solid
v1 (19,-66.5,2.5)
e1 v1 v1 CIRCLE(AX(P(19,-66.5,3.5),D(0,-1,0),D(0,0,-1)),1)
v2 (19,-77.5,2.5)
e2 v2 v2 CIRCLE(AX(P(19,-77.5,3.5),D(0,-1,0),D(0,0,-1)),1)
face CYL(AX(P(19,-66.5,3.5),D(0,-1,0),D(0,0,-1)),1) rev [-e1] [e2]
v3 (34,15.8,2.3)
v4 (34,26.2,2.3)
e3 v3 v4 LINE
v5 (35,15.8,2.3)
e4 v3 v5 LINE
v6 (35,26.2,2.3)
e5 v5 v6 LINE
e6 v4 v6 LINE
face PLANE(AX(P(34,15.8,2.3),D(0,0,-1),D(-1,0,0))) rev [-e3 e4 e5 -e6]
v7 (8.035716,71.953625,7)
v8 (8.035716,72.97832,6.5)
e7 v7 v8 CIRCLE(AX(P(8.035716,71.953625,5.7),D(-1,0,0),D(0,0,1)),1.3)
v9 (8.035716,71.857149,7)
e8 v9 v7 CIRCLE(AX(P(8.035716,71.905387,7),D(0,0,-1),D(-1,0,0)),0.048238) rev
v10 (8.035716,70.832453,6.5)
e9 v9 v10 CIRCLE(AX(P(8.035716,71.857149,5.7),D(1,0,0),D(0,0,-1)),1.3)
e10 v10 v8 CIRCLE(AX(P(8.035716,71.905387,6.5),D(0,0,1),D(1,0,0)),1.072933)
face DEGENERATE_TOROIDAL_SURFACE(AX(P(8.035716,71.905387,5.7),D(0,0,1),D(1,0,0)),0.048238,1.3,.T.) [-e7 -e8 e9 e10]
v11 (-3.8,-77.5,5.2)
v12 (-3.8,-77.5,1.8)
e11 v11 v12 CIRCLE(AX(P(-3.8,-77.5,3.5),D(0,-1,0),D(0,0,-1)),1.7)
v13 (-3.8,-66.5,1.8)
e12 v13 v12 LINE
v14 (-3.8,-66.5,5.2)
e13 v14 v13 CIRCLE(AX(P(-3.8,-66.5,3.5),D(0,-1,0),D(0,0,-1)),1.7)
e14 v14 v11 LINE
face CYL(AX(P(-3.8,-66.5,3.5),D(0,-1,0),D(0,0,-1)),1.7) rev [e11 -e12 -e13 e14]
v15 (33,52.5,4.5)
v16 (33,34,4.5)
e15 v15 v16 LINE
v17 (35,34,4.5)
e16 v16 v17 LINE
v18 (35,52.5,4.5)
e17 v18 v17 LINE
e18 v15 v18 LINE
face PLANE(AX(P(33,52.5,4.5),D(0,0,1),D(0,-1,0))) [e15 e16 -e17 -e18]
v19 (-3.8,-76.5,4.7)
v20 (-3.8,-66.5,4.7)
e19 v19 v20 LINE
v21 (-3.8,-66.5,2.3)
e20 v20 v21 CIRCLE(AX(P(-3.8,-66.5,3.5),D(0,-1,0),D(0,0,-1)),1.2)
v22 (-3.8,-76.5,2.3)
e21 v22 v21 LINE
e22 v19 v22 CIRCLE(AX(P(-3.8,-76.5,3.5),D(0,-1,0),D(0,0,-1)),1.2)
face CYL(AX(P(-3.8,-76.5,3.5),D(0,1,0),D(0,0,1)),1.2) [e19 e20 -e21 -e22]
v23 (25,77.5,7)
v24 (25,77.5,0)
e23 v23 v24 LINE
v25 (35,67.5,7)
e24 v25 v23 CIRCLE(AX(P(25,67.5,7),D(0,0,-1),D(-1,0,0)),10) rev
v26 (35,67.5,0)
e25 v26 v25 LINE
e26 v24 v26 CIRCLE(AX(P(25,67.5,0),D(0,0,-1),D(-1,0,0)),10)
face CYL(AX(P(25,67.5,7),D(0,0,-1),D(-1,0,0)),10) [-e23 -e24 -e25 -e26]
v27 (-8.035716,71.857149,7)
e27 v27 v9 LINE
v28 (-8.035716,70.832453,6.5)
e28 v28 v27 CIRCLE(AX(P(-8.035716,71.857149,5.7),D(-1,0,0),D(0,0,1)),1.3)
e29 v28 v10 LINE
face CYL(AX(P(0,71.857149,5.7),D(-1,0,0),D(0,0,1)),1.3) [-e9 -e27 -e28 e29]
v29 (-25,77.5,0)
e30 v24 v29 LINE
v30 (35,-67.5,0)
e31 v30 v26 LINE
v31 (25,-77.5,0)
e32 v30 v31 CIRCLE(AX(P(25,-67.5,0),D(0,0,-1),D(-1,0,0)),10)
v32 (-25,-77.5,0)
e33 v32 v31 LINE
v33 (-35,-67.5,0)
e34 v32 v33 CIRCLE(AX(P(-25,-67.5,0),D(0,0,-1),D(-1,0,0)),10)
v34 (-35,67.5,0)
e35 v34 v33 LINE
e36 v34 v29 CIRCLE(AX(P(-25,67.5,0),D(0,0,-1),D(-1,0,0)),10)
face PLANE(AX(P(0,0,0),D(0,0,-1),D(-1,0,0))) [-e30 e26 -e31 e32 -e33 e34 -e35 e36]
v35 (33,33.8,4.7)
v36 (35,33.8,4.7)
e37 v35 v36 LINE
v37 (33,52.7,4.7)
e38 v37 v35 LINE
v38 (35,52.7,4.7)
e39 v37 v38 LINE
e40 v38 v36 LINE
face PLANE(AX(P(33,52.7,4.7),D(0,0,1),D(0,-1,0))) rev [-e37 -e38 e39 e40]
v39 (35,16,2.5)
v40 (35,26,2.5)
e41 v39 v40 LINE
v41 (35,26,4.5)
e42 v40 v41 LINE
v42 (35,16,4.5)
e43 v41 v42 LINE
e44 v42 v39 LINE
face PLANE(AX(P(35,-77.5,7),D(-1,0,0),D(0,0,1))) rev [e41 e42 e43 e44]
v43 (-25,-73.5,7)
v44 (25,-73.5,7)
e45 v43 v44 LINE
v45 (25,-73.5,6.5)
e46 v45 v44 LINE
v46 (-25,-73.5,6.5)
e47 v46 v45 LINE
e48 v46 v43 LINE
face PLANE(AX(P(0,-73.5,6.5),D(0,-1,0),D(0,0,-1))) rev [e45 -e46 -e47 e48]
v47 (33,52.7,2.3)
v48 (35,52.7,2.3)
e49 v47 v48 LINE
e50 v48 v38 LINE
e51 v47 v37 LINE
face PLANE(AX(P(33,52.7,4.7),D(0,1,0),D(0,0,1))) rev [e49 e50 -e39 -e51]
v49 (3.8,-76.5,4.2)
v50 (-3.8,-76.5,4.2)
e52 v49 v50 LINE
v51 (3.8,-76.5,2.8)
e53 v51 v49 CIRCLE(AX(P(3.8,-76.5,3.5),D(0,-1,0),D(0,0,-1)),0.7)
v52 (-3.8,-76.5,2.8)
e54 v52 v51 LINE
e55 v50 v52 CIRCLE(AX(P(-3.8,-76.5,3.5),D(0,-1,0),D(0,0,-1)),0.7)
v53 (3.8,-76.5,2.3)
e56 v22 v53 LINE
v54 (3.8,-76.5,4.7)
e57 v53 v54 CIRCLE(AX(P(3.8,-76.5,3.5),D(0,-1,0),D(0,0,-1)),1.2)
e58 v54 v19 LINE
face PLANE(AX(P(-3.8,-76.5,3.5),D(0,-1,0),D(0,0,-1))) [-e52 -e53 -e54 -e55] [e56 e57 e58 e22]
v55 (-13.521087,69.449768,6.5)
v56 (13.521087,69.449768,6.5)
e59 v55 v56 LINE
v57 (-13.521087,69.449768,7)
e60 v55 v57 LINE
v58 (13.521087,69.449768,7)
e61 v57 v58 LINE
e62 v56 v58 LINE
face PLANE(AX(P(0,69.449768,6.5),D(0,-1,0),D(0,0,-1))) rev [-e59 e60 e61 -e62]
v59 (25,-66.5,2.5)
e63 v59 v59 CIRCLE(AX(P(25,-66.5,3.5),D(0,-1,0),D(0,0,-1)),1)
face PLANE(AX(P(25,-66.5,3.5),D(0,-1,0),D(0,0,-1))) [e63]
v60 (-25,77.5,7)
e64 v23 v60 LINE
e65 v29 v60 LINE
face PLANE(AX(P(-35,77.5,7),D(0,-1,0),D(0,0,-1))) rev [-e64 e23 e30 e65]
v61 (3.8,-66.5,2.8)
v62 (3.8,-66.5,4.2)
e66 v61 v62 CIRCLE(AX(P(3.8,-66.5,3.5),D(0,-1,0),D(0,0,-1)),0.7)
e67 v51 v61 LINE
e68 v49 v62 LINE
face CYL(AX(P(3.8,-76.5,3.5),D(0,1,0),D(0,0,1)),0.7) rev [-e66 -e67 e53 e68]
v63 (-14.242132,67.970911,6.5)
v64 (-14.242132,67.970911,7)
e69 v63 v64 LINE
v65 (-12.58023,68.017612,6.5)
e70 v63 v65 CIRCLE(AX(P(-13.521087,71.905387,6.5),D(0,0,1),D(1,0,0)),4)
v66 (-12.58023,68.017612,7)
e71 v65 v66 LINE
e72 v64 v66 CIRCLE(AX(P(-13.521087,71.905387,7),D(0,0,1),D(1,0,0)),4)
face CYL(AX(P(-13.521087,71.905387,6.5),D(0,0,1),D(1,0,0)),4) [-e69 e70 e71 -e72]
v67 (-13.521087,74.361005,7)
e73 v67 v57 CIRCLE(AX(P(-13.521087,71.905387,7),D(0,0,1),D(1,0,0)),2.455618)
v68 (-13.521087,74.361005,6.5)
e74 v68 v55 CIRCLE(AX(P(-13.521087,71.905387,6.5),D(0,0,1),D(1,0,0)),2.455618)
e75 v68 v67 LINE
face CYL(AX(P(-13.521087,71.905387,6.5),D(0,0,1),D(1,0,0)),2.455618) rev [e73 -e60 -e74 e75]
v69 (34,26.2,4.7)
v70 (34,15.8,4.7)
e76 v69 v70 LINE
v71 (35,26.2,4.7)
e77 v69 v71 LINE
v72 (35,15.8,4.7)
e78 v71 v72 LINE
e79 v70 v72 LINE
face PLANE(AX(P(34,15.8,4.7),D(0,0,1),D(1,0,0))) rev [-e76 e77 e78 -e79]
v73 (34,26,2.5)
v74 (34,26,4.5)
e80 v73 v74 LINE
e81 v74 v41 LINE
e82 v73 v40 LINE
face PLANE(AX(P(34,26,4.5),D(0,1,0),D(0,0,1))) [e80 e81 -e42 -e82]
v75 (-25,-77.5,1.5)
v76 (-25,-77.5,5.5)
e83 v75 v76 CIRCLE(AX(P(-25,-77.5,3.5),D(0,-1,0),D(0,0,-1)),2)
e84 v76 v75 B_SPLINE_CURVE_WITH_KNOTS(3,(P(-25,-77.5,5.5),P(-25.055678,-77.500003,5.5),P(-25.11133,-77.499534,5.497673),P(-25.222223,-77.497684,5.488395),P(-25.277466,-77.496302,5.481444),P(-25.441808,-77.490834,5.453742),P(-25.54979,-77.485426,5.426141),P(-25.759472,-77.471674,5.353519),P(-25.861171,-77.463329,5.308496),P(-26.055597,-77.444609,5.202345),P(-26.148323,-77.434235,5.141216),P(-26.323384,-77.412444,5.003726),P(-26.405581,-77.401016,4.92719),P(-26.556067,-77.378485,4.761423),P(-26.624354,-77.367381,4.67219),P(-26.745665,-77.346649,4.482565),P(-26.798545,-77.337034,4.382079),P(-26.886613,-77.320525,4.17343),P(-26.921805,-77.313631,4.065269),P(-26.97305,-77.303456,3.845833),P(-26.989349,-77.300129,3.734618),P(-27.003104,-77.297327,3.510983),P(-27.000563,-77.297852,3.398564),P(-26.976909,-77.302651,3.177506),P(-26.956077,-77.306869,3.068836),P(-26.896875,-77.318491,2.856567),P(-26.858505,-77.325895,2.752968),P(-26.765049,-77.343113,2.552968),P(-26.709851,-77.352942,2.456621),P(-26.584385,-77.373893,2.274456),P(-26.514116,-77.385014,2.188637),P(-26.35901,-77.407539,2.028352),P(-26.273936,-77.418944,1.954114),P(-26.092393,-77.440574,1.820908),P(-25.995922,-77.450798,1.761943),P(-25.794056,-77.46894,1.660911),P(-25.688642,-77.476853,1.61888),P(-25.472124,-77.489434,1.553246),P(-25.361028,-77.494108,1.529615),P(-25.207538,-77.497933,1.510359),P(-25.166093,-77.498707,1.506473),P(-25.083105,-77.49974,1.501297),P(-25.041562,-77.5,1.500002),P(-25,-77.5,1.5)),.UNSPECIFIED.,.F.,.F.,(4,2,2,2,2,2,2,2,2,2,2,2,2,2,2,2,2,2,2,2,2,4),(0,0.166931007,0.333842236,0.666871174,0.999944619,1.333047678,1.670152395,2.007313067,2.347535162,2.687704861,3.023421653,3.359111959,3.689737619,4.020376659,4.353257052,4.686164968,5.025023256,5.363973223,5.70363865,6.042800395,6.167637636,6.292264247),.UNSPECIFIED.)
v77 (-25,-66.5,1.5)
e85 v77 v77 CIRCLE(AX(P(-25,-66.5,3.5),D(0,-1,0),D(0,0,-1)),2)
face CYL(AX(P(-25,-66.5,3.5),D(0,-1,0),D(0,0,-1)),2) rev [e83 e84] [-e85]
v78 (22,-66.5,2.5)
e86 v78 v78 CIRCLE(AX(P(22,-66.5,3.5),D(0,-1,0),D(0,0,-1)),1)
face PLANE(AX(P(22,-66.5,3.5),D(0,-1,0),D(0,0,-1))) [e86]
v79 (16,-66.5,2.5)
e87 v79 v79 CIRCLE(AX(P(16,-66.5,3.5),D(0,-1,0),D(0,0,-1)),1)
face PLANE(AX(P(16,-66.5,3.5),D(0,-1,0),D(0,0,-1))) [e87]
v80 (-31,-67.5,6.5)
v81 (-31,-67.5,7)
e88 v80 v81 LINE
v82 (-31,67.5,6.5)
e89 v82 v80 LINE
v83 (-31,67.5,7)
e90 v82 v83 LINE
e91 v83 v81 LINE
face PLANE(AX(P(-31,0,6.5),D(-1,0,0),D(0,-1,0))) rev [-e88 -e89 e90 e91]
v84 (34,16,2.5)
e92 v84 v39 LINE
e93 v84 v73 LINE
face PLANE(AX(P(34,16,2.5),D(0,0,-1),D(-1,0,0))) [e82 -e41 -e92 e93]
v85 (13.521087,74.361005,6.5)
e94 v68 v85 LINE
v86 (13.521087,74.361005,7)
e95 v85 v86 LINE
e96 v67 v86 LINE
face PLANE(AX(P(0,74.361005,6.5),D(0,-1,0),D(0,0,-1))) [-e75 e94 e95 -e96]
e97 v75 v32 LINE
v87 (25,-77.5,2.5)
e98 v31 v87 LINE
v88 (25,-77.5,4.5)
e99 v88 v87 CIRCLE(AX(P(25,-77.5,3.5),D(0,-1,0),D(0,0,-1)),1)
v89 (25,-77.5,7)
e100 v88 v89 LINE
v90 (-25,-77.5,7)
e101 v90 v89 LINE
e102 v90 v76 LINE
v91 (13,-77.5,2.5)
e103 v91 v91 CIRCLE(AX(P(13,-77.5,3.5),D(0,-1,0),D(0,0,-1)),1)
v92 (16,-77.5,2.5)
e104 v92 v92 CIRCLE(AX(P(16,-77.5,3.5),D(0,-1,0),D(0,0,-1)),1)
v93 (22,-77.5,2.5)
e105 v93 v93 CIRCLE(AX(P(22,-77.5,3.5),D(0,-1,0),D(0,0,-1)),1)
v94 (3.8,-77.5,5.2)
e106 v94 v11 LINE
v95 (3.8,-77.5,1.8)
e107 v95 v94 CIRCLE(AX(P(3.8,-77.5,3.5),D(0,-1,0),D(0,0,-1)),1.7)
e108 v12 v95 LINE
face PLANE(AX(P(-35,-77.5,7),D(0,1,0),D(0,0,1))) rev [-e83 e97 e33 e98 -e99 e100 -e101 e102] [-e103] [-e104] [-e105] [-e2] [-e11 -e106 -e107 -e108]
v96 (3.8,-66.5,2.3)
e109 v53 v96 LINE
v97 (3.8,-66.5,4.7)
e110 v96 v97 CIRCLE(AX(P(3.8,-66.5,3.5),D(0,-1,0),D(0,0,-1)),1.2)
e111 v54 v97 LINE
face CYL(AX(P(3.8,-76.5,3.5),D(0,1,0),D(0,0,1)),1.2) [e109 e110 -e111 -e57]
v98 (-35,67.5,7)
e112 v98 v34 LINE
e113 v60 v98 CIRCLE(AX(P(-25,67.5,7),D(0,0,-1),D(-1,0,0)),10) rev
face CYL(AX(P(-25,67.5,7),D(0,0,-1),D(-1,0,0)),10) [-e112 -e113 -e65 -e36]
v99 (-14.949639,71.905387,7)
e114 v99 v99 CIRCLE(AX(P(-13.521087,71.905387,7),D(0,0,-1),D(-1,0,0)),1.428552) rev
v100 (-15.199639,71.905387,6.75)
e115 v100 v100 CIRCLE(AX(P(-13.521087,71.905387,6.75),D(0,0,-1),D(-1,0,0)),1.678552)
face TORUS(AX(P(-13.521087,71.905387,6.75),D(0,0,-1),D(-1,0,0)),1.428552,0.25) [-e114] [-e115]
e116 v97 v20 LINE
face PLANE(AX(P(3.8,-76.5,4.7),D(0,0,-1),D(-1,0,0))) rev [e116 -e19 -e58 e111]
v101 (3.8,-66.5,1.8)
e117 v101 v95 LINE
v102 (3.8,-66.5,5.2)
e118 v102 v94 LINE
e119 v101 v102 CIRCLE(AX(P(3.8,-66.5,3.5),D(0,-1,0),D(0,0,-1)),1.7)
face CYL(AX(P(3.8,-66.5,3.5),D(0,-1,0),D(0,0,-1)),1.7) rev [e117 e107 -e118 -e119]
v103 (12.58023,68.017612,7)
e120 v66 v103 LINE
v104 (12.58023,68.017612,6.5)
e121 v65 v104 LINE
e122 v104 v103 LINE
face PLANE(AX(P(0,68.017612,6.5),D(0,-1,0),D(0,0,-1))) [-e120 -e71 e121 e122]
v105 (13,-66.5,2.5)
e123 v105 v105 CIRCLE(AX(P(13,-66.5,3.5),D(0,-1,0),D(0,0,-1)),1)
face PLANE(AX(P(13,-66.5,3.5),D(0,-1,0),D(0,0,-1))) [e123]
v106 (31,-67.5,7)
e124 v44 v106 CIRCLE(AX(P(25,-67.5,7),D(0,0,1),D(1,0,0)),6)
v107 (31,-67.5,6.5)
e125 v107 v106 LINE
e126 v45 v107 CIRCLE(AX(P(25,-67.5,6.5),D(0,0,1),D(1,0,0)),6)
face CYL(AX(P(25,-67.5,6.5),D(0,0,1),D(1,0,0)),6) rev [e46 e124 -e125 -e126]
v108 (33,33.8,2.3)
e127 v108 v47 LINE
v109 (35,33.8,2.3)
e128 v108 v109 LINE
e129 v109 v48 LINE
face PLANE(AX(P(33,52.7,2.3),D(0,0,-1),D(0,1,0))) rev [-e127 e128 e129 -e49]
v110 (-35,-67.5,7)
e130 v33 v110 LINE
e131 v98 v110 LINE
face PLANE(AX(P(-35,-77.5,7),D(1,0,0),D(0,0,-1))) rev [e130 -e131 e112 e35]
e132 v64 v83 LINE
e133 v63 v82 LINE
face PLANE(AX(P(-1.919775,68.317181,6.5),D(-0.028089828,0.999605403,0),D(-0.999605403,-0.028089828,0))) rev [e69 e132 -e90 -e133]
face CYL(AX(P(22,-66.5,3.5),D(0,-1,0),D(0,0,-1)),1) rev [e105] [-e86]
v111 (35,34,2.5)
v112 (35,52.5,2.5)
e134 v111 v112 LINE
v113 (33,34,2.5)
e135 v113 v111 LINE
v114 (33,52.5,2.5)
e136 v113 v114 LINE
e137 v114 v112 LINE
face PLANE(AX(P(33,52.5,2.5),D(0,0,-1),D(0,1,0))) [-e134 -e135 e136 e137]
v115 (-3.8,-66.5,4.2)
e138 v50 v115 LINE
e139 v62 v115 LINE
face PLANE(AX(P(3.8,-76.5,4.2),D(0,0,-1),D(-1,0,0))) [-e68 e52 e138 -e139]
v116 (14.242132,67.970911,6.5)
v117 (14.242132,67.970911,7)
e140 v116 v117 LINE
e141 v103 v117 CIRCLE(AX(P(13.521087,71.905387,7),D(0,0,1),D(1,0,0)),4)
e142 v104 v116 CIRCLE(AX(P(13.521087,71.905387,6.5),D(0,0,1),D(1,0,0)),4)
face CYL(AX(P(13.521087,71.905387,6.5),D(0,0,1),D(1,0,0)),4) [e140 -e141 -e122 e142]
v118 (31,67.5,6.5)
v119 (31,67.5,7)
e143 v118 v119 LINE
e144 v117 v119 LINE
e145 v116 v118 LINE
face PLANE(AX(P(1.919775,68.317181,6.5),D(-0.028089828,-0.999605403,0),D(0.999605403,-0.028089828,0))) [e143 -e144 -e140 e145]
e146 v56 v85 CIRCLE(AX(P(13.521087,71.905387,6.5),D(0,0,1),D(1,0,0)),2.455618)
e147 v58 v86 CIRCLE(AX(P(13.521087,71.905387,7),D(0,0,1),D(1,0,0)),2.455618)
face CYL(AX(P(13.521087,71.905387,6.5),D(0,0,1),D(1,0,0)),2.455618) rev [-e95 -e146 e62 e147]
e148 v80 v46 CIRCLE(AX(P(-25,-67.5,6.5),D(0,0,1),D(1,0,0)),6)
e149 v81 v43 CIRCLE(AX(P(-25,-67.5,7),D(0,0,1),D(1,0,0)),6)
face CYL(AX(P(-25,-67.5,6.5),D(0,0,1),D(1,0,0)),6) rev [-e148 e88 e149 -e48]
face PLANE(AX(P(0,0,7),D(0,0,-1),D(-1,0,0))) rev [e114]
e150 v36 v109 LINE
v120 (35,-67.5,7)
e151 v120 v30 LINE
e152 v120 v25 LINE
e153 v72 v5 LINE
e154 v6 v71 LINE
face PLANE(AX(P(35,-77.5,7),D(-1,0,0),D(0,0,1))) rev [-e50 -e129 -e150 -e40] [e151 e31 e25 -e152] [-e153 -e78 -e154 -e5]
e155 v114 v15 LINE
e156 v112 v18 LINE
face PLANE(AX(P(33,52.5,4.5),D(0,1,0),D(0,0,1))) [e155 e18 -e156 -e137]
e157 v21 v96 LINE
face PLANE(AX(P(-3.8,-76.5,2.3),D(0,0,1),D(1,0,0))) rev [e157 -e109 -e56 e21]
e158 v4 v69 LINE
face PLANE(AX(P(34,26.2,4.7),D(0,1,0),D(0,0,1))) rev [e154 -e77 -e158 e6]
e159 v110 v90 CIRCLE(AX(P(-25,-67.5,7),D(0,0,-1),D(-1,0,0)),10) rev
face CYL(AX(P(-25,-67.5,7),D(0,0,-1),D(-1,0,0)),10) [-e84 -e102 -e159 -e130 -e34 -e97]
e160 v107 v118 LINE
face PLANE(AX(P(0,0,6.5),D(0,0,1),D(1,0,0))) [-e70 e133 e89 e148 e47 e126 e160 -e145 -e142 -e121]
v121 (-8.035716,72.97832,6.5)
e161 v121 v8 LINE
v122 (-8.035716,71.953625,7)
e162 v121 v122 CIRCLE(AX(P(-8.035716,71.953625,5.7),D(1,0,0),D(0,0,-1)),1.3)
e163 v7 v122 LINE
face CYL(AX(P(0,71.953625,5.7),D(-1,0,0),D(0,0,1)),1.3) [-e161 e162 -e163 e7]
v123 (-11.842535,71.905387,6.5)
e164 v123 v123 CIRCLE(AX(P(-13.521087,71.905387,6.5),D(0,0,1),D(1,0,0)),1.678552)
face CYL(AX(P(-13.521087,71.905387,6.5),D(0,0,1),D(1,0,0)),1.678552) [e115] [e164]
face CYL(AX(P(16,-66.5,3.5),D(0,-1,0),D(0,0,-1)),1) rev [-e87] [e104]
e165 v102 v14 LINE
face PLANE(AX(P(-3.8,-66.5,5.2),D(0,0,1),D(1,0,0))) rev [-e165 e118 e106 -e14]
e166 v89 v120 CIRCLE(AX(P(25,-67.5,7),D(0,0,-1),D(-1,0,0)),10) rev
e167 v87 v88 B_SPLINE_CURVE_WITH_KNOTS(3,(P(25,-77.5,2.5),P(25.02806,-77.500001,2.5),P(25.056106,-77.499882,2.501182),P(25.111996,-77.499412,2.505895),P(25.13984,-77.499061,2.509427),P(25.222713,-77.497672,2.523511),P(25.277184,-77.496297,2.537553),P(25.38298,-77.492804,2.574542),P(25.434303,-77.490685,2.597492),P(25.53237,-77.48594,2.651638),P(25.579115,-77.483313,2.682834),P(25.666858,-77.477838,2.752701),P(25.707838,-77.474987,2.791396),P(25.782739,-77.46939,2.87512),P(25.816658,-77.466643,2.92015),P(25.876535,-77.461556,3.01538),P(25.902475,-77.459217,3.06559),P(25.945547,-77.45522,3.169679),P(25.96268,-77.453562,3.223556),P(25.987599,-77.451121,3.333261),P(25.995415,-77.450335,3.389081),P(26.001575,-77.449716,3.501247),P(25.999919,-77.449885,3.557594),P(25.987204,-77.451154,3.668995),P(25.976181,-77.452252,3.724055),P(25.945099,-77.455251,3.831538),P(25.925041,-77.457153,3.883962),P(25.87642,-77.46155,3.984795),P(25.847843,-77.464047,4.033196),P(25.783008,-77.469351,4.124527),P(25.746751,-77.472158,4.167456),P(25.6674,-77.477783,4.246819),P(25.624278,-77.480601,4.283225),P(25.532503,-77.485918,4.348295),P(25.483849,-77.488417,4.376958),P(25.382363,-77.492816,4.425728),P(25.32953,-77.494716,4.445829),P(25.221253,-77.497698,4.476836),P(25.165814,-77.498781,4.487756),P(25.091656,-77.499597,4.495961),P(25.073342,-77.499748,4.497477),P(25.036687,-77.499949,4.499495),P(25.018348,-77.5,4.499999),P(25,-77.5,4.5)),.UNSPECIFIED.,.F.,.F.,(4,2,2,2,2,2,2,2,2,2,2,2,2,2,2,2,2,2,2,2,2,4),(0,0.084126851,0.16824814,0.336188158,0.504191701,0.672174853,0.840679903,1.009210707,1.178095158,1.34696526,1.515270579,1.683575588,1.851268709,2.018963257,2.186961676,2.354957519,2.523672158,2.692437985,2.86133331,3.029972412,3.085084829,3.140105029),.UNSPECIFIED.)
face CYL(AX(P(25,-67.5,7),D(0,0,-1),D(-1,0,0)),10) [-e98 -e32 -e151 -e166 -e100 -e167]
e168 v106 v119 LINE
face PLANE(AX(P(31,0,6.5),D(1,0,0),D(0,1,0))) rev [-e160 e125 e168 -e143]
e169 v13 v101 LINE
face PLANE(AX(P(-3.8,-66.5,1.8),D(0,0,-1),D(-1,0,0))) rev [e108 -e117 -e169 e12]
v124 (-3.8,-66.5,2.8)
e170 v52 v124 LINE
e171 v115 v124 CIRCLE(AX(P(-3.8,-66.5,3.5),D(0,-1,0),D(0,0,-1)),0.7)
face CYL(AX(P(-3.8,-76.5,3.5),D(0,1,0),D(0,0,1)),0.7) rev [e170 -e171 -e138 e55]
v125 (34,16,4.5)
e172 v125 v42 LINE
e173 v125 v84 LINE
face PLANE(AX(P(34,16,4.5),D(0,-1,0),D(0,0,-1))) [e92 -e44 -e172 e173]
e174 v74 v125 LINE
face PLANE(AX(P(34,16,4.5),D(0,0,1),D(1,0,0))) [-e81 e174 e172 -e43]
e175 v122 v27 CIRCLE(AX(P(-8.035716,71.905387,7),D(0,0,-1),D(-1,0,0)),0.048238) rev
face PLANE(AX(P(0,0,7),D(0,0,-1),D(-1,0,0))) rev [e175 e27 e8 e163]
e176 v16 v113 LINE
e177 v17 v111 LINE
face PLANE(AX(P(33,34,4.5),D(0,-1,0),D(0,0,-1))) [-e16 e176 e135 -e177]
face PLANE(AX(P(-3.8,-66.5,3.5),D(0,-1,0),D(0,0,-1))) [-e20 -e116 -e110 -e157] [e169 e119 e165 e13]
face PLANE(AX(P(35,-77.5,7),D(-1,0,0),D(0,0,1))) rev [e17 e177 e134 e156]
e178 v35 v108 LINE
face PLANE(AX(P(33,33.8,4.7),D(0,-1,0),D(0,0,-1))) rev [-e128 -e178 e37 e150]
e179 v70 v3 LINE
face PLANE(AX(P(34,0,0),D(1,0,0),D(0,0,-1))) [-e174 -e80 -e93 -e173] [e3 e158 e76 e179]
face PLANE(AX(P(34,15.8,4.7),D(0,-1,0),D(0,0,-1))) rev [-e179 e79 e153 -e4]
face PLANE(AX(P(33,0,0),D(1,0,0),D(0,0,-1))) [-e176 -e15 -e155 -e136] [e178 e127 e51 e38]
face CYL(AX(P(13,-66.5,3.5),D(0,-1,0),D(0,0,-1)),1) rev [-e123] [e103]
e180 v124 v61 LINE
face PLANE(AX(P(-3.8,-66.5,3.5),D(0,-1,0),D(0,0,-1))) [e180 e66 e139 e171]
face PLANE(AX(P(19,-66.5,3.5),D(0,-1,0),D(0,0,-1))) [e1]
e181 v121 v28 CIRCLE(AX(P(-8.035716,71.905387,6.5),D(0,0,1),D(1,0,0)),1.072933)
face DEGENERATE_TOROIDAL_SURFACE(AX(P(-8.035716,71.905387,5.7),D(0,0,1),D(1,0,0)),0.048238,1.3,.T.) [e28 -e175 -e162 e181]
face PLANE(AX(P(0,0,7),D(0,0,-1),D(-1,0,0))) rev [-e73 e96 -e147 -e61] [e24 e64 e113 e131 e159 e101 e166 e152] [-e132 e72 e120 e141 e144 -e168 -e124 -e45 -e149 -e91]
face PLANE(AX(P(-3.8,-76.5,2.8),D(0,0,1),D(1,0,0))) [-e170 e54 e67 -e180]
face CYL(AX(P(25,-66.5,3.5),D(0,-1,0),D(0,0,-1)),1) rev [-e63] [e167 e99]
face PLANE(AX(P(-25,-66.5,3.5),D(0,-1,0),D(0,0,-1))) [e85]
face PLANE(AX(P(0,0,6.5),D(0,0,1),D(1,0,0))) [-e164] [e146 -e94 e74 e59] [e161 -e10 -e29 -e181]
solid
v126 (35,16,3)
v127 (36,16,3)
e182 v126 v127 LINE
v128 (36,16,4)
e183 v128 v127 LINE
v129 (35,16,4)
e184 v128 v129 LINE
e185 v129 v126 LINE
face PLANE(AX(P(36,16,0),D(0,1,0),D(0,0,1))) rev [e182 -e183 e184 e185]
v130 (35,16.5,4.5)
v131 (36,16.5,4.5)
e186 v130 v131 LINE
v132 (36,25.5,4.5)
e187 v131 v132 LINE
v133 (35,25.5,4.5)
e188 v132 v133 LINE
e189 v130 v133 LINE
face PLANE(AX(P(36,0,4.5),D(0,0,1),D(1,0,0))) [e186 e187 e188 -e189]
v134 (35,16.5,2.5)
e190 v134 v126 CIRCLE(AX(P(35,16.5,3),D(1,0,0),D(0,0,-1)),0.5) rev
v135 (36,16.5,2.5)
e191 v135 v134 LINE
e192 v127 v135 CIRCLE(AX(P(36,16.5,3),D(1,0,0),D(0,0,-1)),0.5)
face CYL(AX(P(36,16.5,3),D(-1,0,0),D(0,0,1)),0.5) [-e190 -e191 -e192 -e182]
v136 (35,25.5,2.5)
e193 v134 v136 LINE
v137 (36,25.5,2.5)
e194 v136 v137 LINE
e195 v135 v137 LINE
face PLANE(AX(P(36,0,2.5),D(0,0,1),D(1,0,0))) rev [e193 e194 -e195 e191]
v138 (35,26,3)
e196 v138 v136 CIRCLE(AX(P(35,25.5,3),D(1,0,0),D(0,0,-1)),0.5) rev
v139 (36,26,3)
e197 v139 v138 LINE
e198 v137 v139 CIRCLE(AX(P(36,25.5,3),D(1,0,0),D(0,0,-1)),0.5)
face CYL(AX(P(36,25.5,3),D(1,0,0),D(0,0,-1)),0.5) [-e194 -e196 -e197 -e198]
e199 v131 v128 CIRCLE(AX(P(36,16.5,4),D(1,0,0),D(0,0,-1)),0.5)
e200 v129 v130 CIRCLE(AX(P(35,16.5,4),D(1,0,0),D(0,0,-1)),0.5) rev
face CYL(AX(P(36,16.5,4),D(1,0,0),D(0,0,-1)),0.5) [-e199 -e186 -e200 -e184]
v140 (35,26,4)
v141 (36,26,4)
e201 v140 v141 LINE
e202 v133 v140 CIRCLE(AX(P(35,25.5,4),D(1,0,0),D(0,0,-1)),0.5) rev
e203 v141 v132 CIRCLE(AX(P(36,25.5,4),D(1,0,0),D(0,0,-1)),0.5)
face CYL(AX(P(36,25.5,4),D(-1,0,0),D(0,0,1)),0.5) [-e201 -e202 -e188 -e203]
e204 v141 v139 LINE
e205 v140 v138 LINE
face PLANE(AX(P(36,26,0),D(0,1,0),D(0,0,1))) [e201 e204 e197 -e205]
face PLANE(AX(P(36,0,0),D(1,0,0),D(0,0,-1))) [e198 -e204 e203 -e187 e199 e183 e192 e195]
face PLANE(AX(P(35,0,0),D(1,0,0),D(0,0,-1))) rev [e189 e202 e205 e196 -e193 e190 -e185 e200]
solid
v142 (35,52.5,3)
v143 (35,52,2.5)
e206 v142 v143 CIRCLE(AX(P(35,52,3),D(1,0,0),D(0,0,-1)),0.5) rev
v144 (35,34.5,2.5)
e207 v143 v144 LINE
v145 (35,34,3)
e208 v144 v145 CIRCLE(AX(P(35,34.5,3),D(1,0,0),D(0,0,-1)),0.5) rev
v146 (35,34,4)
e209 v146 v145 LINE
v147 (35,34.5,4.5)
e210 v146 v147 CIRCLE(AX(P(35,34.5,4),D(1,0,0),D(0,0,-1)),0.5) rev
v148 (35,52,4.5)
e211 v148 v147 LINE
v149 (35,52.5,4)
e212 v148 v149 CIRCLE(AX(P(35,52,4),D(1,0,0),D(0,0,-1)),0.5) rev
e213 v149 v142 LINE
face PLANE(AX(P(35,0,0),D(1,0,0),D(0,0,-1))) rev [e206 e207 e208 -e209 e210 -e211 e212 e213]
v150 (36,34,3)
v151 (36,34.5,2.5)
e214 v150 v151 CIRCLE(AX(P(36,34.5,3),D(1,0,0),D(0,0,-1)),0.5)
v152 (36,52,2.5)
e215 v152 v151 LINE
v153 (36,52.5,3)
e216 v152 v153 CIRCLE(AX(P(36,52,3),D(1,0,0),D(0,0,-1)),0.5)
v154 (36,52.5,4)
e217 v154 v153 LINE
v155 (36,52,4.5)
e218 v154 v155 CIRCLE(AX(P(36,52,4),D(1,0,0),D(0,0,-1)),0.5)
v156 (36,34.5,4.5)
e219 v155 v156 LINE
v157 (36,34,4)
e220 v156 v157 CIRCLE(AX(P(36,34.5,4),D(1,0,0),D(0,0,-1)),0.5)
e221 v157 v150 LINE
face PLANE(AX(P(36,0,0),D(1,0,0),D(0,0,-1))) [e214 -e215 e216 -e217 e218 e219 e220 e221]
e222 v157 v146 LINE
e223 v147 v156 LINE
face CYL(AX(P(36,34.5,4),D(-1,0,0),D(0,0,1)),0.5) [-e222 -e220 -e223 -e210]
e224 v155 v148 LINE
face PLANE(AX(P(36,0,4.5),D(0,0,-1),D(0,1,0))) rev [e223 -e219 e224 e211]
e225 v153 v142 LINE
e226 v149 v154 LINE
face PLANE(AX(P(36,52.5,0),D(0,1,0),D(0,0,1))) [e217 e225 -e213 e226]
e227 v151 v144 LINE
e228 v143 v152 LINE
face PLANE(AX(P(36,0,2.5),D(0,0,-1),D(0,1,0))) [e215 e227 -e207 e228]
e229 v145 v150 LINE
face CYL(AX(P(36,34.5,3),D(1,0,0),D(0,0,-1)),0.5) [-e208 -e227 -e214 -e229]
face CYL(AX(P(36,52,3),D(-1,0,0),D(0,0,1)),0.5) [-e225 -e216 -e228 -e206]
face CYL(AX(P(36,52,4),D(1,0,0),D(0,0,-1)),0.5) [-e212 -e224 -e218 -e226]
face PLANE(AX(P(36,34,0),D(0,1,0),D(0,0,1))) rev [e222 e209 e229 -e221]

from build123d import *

# Parameters (mm, degrees)
SKETCH1_W           = 70
SKETCH1_H           = 155
BOSS_EXTRUDE1_DEPTH = 7
FILLET1_R           = 10
SKETCH3_W           = 2.4
SKETCH3_H           = 18.9
SKETCH3_W_2         = 2
SKETCH3_H_2         = 18.5
CUT_EXTRUDE1_DEPTH  = 2
SKETCH3_2_W         = 2
SKETCH3_2_H         = 18.5
BOSS_EXTRUDE2_DEPTH = 1
FILLET2_R           = 0.5
SKETCH4_W           = 2.4
SKETCH4_H           = 10.4
SKETCH4_W_2         = 2
SKETCH4_H_2         = 10
CUT_EXTRUDE2_DEPTH  = 1
SKETCH4_2_W         = 2
SKETCH4_2_H         = 10
BOSS_EXTRUDE3_DEPTH = 1
FILLET3_R           = 0.5
SKETCH6_R           = 2
SKETCH6_R_2         = 1
CUT_EXTRUDE3_DEPTH  = 11
BOSS_EXTRUDE4_DEPTH = 10
SKETCH8_R           = 1.678551751
CUT_EXTRUDE4_DEPTH  = 0.5
FILLET4_R           = 1.3
FILLET5_R           = 0.25


with BuildPart() as part:
    # Sketch1 → Boss-Extrude1 (new body)
    with BuildSketch(Plane.XY):
        Rectangle(SKETCH1_W, SKETCH1_H)
    extrude(amount=BOSS_EXTRUDE1_DEPTH)

    # Fillet1
    fillet1_edges = [part.edges().sort_by_distance(p)[0] for p in [
        (35, -77.5, 3.5),
        (-35, -77.5, 3.5),
        (-35, 77.5, 3.5),
        (35, 77.5, 3.5),
    ]]
    fillet(fillet1_edges, radius=FILLET1_R)

    # Sketch3 → Cut-Extrude1 (cut)
    with BuildSketch(Plane(origin=(35, 0, 0), x_dir=(0, 0, -1), z_dir=(1, 0, 0))):
        with Locations((-3.5, 43.25)):
            Rectangle(SKETCH3_W, SKETCH3_H)
        with Locations((-3.5, 43.25)):
            Rectangle(SKETCH3_W_2, SKETCH3_H_2, mode=Mode.SUBTRACT)
    extrude(amount=-CUT_EXTRUDE1_DEPTH, mode=Mode.SUBTRACT)

    # Sketch4 → Cut-Extrude2 (cut)
    with BuildSketch(Plane(origin=(35, 0, 0), x_dir=(0, 0, -1), z_dir=(1, 0, 0))):
        with Locations((-3.5, 21)):
            Rectangle(SKETCH4_W, SKETCH4_H)
        with Locations((-3.5, 21)):
            Rectangle(SKETCH4_W_2, SKETCH4_H_2, mode=Mode.SUBTRACT)
    extrude(amount=-CUT_EXTRUDE2_DEPTH, mode=Mode.SUBTRACT)

    # Sketch6 → Cut-Extrude3 (cut)
    with BuildSketch(Plane.XZ.offset(77.5)):
        with Locations(Location((-25, 3.5, 0), (0, 0, 270))):
            Circle(SKETCH6_R)
        with Locations(Location((22, 3.5, 0), (0, 0, 270))):
            Circle(SKETCH6_R_2)
        with Locations(Location((19, 3.5, 0), (0, 0, 270))):
            Circle(SKETCH6_R_2)
        with Locations(Location((16, 3.5, 0), (0, 0, 270))):
            Circle(SKETCH6_R_2)
        with Locations(Location((13, 3.5, 0), (0, 0, 270))):
            Circle(SKETCH6_R_2)
        with Locations(Location((25, 3.5, 0), (0, 0, 270))):
            Circle(SKETCH6_R_2)
        with BuildLine():
            Line((-3.8, 5.2), (3.8, 5.2))
            ThreePointArc((3.8, 5.2), (5.5, 3.5), (3.8, 1.8))
            Line((3.8, 1.8), (-3.8, 1.8))
            ThreePointArc((-3.8, 1.8), (-5.5, 3.5), (-3.8, 5.2))
        make_face()
    extrude(amount=-CUT_EXTRUDE3_DEPTH, mode=Mode.SUBTRACT)

    # Sketch7 → Boss-Extrude4 (add)
    with BuildSketch(Plane.XZ.offset(66.5)):
        with BuildLine():
            Line((-3.8, 2.3), (3.8, 2.3))
            ThreePointArc((3.8, 2.3), (5, 3.5), (3.8, 4.7))
            Line((3.8, 4.7), (-3.8, 4.7))
            ThreePointArc((-3.8, 4.7), (-5, 3.5), (-3.8, 2.3))
        make_face()
        with BuildLine():
            Line((-3.8, 2.8), (3.8, 2.8))
            ThreePointArc((3.8, 2.8), (4.5, 3.5), (3.8, 4.2))
            Line((3.8, 4.2), (-3.8, 4.2))
            ThreePointArc((-3.8, 4.2), (-4.5, 3.5), (-3.8, 2.8))
        make_face(mode=Mode.SUBTRACT)
    extrude(amount=BOSS_EXTRUDE4_DEPTH)

    # Sketch8 → Cut-Extrude4 (cut)
    # profile 1 of 2: a face of its own
    with BuildSketch(Plane.XY.offset(7)):
        with BuildLine():
            Line((-14.242131715, 67.97091146), (-31, 67.5))
            Line((-31, 67.5), (-31, -67.5))
            ThreePointArc((-31, -67.5), (-29.242640687, -71.742640687), (-25, -73.5))
            Line((-25, -73.5), (25, -73.5))
            ThreePointArc((25, -73.5), (29.242640687, -71.742640687), (31, -67.5))
            Line((31, -67.5), (31, 67.5))
            Line((31, 67.5), (14.242131715, 67.97091146))
            ThreePointArc((14.242131715, 67.97091146), (13.408727505, 67.906964941), (12.580229547, 68.017612435))
            Line((12.580229547, 68.017612435), (-12.580229547, 68.017612435))
            ThreePointArc((-12.580229547, 68.017612435), (-13.408727505, 67.906964941), (-14.242131715, 67.97091146))
        make_face()
    # profile 2 of 2: a face of its own
    with BuildSketch(Plane.XY.offset(7)):
        with BuildLine():
            Line((-13.521086818, 69.44976806), (13.521086818, 69.44976806))
            ThreePointArc((13.521086818, 69.44976806), (15.976705311, 71.905386553), (13.521086818, 74.361005047))
            Line((13.521086818, 74.361005047), (-13.521086818, 74.361005047))
            ThreePointArc((-13.521086818, 74.361005047), (-15.976705311, 71.905386553), (-13.521086818, 69.44976806))
        make_face()
        with Locations((-13.521086818, 71.905386553)):
            Circle(SKETCH8_R, mode=Mode.SUBTRACT)
        with BuildLine():
            ThreePointArc((8.03571554, 70.832453492), (9.108648601, 71.905386553), (8.03571554, 72.978319614))
            Line((8.03571554, 72.978319614), (-8.03571554, 72.978319614))
            ThreePointArc((-8.03571554, 72.978319614), (-9.108648601, 71.905386553), (-8.03571554, 70.832453492))
            Line((-8.03571554, 70.832453492), (8.03571554, 70.832453492))
        make_face(mode=Mode.SUBTRACT)
    extrude(amount=-CUT_EXTRUDE4_DEPTH, mode=Mode.SUBTRACT)

    # Fillet4
    # the kernel refuses this fillet: 1.3 mm, written as the material it takes off along each edge
    with BuildSketch(Plane(origin=(8.03571554, 72.978319614, 7), x_dir=(0, 0, -1), z_dir=(-1, 0, 0)), Plane(origin=(-8.03571554, 70.832453492, 7), x_dir=(0, 0, -1), z_dir=(1, 0, 0))) as fillet4_piece_1:
        with BuildLine():
            CenterArc((1.3, 1.024695077), FILLET4_R, 180, 52.020127555)
            Line((0, 1.024695077), (-0.026, 1.024695077))
            Line((-0.026, 1.024695077), (-0.026, 0))
            Line((-0.026, 0), (0, -0.026))
            ThreePointArc((0, -0.026), (0.25, -0.026), (0.484, -0.020493902))
            Line((0.484, -0.020493902), (0.5, 0))
        make_face()
    extrude(amount=16.07143108, mode=Mode.SUBTRACT)
    with BuildSketch(Plane(origin=(-8.03571554, 71.905386553, 7), x_dir=(0, 1, 0), z_dir=(1, 0, 0))) as fillet4_piece_2:
        with BuildLine():
            CenterArc((0.048237984, -1.3), FILLET4_R, 37.979872445, 52.020127555)
            Line((0.048237984, 0), (0.048237984, 0.026))
            Line((0.048237984, 0.026), (1.072933061, 0.026))
            Line((1.072933061, 0.026), (1.098933061, 0))
            ThreePointArc((1.098933061, 0), (1.098933061, -0.25), (1.093426962, -0.484))
            Line((1.093426962, -0.484), (1.072933061, -0.5))
        make_face()
    revolve(axis=Axis((-8.03571554, 71.905386553, 7), (0, 0, 1)), revolution_arc=180, mode=Mode.SUBTRACT)
    with BuildSketch(Plane(origin=(8.03571554, 71.905386553, 7), x_dir=(0, -1, 0), z_dir=(-1, 0, 0))) as fillet4_piece_3:
        with BuildLine():
            CenterArc((0.048237984, -1.3), FILLET4_R, 37.979872445, 52.020127555)
            Line((0.048237984, 0), (0.048237984, 0.026))
            Line((0.048237984, 0.026), (1.072933061, 0.026))
            Line((1.072933061, 0.026), (1.098933061, 0))
            ThreePointArc((1.098933061, 0), (1.098933061, -0.25), (1.093426962, -0.484))
            Line((1.093426962, -0.484), (1.072933061, -0.5))
        make_face()
    revolve(axis=Axis((8.03571554, 71.905386553, 7), (0, 0, 1)), revolution_arc=180, mode=Mode.SUBTRACT)

    # Fillet5
    fillet5_edges = [part.edges().sort_by_distance(p)[0] for p in [
        (-15.199638568, 71.905386553, 7),
    ]]
    fillet(fillet5_edges, radius=FILLET5_R)


with BuildPart() as body_2:
    # Sketch3<2> → Boss-Extrude2 (new body)
    with BuildSketch(Plane(origin=(35, 0, 0), x_dir=(0, 0, -1), z_dir=(1, 0, 0))):
        with Locations((-3.5, 43.25)):
            Rectangle(SKETCH3_2_W, SKETCH3_2_H)
    extrude(amount=BOSS_EXTRUDE2_DEPTH)

    # Fillet2
    fillet2_edges = [body_2.edges().sort_by_distance(p)[0] for p in [
        (35.5, 34, 2.5),
        (35.5, 34, 4.5),
        (35.5, 52.5, 4.5),
        (35.5, 52.5, 2.5),
    ]]
    fillet(fillet2_edges, radius=FILLET2_R)


with BuildPart() as body_3:
    # Sketch4<2> → Boss-Extrude3 (new body)
    with BuildSketch(Plane(origin=(35, 0, 0), x_dir=(0, 0, -1), z_dir=(1, 0, 0))):
        with Locations((-3.5, 21)):
            Rectangle(SKETCH4_2_W, SKETCH4_2_H)
    extrude(amount=BOSS_EXTRUDE3_DEPTH)

    # Fillet3
    fillet3_edges = [body_3.edges().sort_by_distance(p)[0] for p in [
        (35.5, 16, 4.5),
        (35.5, 26, 4.5),
        (35.5, 26, 2.5),
        (35.5, 16, 2.5),
    ]]
    fillet(fillet3_edges, radius=FILLET3_R)


solid = Compound([part.part, body_2.part, body_3.part])
